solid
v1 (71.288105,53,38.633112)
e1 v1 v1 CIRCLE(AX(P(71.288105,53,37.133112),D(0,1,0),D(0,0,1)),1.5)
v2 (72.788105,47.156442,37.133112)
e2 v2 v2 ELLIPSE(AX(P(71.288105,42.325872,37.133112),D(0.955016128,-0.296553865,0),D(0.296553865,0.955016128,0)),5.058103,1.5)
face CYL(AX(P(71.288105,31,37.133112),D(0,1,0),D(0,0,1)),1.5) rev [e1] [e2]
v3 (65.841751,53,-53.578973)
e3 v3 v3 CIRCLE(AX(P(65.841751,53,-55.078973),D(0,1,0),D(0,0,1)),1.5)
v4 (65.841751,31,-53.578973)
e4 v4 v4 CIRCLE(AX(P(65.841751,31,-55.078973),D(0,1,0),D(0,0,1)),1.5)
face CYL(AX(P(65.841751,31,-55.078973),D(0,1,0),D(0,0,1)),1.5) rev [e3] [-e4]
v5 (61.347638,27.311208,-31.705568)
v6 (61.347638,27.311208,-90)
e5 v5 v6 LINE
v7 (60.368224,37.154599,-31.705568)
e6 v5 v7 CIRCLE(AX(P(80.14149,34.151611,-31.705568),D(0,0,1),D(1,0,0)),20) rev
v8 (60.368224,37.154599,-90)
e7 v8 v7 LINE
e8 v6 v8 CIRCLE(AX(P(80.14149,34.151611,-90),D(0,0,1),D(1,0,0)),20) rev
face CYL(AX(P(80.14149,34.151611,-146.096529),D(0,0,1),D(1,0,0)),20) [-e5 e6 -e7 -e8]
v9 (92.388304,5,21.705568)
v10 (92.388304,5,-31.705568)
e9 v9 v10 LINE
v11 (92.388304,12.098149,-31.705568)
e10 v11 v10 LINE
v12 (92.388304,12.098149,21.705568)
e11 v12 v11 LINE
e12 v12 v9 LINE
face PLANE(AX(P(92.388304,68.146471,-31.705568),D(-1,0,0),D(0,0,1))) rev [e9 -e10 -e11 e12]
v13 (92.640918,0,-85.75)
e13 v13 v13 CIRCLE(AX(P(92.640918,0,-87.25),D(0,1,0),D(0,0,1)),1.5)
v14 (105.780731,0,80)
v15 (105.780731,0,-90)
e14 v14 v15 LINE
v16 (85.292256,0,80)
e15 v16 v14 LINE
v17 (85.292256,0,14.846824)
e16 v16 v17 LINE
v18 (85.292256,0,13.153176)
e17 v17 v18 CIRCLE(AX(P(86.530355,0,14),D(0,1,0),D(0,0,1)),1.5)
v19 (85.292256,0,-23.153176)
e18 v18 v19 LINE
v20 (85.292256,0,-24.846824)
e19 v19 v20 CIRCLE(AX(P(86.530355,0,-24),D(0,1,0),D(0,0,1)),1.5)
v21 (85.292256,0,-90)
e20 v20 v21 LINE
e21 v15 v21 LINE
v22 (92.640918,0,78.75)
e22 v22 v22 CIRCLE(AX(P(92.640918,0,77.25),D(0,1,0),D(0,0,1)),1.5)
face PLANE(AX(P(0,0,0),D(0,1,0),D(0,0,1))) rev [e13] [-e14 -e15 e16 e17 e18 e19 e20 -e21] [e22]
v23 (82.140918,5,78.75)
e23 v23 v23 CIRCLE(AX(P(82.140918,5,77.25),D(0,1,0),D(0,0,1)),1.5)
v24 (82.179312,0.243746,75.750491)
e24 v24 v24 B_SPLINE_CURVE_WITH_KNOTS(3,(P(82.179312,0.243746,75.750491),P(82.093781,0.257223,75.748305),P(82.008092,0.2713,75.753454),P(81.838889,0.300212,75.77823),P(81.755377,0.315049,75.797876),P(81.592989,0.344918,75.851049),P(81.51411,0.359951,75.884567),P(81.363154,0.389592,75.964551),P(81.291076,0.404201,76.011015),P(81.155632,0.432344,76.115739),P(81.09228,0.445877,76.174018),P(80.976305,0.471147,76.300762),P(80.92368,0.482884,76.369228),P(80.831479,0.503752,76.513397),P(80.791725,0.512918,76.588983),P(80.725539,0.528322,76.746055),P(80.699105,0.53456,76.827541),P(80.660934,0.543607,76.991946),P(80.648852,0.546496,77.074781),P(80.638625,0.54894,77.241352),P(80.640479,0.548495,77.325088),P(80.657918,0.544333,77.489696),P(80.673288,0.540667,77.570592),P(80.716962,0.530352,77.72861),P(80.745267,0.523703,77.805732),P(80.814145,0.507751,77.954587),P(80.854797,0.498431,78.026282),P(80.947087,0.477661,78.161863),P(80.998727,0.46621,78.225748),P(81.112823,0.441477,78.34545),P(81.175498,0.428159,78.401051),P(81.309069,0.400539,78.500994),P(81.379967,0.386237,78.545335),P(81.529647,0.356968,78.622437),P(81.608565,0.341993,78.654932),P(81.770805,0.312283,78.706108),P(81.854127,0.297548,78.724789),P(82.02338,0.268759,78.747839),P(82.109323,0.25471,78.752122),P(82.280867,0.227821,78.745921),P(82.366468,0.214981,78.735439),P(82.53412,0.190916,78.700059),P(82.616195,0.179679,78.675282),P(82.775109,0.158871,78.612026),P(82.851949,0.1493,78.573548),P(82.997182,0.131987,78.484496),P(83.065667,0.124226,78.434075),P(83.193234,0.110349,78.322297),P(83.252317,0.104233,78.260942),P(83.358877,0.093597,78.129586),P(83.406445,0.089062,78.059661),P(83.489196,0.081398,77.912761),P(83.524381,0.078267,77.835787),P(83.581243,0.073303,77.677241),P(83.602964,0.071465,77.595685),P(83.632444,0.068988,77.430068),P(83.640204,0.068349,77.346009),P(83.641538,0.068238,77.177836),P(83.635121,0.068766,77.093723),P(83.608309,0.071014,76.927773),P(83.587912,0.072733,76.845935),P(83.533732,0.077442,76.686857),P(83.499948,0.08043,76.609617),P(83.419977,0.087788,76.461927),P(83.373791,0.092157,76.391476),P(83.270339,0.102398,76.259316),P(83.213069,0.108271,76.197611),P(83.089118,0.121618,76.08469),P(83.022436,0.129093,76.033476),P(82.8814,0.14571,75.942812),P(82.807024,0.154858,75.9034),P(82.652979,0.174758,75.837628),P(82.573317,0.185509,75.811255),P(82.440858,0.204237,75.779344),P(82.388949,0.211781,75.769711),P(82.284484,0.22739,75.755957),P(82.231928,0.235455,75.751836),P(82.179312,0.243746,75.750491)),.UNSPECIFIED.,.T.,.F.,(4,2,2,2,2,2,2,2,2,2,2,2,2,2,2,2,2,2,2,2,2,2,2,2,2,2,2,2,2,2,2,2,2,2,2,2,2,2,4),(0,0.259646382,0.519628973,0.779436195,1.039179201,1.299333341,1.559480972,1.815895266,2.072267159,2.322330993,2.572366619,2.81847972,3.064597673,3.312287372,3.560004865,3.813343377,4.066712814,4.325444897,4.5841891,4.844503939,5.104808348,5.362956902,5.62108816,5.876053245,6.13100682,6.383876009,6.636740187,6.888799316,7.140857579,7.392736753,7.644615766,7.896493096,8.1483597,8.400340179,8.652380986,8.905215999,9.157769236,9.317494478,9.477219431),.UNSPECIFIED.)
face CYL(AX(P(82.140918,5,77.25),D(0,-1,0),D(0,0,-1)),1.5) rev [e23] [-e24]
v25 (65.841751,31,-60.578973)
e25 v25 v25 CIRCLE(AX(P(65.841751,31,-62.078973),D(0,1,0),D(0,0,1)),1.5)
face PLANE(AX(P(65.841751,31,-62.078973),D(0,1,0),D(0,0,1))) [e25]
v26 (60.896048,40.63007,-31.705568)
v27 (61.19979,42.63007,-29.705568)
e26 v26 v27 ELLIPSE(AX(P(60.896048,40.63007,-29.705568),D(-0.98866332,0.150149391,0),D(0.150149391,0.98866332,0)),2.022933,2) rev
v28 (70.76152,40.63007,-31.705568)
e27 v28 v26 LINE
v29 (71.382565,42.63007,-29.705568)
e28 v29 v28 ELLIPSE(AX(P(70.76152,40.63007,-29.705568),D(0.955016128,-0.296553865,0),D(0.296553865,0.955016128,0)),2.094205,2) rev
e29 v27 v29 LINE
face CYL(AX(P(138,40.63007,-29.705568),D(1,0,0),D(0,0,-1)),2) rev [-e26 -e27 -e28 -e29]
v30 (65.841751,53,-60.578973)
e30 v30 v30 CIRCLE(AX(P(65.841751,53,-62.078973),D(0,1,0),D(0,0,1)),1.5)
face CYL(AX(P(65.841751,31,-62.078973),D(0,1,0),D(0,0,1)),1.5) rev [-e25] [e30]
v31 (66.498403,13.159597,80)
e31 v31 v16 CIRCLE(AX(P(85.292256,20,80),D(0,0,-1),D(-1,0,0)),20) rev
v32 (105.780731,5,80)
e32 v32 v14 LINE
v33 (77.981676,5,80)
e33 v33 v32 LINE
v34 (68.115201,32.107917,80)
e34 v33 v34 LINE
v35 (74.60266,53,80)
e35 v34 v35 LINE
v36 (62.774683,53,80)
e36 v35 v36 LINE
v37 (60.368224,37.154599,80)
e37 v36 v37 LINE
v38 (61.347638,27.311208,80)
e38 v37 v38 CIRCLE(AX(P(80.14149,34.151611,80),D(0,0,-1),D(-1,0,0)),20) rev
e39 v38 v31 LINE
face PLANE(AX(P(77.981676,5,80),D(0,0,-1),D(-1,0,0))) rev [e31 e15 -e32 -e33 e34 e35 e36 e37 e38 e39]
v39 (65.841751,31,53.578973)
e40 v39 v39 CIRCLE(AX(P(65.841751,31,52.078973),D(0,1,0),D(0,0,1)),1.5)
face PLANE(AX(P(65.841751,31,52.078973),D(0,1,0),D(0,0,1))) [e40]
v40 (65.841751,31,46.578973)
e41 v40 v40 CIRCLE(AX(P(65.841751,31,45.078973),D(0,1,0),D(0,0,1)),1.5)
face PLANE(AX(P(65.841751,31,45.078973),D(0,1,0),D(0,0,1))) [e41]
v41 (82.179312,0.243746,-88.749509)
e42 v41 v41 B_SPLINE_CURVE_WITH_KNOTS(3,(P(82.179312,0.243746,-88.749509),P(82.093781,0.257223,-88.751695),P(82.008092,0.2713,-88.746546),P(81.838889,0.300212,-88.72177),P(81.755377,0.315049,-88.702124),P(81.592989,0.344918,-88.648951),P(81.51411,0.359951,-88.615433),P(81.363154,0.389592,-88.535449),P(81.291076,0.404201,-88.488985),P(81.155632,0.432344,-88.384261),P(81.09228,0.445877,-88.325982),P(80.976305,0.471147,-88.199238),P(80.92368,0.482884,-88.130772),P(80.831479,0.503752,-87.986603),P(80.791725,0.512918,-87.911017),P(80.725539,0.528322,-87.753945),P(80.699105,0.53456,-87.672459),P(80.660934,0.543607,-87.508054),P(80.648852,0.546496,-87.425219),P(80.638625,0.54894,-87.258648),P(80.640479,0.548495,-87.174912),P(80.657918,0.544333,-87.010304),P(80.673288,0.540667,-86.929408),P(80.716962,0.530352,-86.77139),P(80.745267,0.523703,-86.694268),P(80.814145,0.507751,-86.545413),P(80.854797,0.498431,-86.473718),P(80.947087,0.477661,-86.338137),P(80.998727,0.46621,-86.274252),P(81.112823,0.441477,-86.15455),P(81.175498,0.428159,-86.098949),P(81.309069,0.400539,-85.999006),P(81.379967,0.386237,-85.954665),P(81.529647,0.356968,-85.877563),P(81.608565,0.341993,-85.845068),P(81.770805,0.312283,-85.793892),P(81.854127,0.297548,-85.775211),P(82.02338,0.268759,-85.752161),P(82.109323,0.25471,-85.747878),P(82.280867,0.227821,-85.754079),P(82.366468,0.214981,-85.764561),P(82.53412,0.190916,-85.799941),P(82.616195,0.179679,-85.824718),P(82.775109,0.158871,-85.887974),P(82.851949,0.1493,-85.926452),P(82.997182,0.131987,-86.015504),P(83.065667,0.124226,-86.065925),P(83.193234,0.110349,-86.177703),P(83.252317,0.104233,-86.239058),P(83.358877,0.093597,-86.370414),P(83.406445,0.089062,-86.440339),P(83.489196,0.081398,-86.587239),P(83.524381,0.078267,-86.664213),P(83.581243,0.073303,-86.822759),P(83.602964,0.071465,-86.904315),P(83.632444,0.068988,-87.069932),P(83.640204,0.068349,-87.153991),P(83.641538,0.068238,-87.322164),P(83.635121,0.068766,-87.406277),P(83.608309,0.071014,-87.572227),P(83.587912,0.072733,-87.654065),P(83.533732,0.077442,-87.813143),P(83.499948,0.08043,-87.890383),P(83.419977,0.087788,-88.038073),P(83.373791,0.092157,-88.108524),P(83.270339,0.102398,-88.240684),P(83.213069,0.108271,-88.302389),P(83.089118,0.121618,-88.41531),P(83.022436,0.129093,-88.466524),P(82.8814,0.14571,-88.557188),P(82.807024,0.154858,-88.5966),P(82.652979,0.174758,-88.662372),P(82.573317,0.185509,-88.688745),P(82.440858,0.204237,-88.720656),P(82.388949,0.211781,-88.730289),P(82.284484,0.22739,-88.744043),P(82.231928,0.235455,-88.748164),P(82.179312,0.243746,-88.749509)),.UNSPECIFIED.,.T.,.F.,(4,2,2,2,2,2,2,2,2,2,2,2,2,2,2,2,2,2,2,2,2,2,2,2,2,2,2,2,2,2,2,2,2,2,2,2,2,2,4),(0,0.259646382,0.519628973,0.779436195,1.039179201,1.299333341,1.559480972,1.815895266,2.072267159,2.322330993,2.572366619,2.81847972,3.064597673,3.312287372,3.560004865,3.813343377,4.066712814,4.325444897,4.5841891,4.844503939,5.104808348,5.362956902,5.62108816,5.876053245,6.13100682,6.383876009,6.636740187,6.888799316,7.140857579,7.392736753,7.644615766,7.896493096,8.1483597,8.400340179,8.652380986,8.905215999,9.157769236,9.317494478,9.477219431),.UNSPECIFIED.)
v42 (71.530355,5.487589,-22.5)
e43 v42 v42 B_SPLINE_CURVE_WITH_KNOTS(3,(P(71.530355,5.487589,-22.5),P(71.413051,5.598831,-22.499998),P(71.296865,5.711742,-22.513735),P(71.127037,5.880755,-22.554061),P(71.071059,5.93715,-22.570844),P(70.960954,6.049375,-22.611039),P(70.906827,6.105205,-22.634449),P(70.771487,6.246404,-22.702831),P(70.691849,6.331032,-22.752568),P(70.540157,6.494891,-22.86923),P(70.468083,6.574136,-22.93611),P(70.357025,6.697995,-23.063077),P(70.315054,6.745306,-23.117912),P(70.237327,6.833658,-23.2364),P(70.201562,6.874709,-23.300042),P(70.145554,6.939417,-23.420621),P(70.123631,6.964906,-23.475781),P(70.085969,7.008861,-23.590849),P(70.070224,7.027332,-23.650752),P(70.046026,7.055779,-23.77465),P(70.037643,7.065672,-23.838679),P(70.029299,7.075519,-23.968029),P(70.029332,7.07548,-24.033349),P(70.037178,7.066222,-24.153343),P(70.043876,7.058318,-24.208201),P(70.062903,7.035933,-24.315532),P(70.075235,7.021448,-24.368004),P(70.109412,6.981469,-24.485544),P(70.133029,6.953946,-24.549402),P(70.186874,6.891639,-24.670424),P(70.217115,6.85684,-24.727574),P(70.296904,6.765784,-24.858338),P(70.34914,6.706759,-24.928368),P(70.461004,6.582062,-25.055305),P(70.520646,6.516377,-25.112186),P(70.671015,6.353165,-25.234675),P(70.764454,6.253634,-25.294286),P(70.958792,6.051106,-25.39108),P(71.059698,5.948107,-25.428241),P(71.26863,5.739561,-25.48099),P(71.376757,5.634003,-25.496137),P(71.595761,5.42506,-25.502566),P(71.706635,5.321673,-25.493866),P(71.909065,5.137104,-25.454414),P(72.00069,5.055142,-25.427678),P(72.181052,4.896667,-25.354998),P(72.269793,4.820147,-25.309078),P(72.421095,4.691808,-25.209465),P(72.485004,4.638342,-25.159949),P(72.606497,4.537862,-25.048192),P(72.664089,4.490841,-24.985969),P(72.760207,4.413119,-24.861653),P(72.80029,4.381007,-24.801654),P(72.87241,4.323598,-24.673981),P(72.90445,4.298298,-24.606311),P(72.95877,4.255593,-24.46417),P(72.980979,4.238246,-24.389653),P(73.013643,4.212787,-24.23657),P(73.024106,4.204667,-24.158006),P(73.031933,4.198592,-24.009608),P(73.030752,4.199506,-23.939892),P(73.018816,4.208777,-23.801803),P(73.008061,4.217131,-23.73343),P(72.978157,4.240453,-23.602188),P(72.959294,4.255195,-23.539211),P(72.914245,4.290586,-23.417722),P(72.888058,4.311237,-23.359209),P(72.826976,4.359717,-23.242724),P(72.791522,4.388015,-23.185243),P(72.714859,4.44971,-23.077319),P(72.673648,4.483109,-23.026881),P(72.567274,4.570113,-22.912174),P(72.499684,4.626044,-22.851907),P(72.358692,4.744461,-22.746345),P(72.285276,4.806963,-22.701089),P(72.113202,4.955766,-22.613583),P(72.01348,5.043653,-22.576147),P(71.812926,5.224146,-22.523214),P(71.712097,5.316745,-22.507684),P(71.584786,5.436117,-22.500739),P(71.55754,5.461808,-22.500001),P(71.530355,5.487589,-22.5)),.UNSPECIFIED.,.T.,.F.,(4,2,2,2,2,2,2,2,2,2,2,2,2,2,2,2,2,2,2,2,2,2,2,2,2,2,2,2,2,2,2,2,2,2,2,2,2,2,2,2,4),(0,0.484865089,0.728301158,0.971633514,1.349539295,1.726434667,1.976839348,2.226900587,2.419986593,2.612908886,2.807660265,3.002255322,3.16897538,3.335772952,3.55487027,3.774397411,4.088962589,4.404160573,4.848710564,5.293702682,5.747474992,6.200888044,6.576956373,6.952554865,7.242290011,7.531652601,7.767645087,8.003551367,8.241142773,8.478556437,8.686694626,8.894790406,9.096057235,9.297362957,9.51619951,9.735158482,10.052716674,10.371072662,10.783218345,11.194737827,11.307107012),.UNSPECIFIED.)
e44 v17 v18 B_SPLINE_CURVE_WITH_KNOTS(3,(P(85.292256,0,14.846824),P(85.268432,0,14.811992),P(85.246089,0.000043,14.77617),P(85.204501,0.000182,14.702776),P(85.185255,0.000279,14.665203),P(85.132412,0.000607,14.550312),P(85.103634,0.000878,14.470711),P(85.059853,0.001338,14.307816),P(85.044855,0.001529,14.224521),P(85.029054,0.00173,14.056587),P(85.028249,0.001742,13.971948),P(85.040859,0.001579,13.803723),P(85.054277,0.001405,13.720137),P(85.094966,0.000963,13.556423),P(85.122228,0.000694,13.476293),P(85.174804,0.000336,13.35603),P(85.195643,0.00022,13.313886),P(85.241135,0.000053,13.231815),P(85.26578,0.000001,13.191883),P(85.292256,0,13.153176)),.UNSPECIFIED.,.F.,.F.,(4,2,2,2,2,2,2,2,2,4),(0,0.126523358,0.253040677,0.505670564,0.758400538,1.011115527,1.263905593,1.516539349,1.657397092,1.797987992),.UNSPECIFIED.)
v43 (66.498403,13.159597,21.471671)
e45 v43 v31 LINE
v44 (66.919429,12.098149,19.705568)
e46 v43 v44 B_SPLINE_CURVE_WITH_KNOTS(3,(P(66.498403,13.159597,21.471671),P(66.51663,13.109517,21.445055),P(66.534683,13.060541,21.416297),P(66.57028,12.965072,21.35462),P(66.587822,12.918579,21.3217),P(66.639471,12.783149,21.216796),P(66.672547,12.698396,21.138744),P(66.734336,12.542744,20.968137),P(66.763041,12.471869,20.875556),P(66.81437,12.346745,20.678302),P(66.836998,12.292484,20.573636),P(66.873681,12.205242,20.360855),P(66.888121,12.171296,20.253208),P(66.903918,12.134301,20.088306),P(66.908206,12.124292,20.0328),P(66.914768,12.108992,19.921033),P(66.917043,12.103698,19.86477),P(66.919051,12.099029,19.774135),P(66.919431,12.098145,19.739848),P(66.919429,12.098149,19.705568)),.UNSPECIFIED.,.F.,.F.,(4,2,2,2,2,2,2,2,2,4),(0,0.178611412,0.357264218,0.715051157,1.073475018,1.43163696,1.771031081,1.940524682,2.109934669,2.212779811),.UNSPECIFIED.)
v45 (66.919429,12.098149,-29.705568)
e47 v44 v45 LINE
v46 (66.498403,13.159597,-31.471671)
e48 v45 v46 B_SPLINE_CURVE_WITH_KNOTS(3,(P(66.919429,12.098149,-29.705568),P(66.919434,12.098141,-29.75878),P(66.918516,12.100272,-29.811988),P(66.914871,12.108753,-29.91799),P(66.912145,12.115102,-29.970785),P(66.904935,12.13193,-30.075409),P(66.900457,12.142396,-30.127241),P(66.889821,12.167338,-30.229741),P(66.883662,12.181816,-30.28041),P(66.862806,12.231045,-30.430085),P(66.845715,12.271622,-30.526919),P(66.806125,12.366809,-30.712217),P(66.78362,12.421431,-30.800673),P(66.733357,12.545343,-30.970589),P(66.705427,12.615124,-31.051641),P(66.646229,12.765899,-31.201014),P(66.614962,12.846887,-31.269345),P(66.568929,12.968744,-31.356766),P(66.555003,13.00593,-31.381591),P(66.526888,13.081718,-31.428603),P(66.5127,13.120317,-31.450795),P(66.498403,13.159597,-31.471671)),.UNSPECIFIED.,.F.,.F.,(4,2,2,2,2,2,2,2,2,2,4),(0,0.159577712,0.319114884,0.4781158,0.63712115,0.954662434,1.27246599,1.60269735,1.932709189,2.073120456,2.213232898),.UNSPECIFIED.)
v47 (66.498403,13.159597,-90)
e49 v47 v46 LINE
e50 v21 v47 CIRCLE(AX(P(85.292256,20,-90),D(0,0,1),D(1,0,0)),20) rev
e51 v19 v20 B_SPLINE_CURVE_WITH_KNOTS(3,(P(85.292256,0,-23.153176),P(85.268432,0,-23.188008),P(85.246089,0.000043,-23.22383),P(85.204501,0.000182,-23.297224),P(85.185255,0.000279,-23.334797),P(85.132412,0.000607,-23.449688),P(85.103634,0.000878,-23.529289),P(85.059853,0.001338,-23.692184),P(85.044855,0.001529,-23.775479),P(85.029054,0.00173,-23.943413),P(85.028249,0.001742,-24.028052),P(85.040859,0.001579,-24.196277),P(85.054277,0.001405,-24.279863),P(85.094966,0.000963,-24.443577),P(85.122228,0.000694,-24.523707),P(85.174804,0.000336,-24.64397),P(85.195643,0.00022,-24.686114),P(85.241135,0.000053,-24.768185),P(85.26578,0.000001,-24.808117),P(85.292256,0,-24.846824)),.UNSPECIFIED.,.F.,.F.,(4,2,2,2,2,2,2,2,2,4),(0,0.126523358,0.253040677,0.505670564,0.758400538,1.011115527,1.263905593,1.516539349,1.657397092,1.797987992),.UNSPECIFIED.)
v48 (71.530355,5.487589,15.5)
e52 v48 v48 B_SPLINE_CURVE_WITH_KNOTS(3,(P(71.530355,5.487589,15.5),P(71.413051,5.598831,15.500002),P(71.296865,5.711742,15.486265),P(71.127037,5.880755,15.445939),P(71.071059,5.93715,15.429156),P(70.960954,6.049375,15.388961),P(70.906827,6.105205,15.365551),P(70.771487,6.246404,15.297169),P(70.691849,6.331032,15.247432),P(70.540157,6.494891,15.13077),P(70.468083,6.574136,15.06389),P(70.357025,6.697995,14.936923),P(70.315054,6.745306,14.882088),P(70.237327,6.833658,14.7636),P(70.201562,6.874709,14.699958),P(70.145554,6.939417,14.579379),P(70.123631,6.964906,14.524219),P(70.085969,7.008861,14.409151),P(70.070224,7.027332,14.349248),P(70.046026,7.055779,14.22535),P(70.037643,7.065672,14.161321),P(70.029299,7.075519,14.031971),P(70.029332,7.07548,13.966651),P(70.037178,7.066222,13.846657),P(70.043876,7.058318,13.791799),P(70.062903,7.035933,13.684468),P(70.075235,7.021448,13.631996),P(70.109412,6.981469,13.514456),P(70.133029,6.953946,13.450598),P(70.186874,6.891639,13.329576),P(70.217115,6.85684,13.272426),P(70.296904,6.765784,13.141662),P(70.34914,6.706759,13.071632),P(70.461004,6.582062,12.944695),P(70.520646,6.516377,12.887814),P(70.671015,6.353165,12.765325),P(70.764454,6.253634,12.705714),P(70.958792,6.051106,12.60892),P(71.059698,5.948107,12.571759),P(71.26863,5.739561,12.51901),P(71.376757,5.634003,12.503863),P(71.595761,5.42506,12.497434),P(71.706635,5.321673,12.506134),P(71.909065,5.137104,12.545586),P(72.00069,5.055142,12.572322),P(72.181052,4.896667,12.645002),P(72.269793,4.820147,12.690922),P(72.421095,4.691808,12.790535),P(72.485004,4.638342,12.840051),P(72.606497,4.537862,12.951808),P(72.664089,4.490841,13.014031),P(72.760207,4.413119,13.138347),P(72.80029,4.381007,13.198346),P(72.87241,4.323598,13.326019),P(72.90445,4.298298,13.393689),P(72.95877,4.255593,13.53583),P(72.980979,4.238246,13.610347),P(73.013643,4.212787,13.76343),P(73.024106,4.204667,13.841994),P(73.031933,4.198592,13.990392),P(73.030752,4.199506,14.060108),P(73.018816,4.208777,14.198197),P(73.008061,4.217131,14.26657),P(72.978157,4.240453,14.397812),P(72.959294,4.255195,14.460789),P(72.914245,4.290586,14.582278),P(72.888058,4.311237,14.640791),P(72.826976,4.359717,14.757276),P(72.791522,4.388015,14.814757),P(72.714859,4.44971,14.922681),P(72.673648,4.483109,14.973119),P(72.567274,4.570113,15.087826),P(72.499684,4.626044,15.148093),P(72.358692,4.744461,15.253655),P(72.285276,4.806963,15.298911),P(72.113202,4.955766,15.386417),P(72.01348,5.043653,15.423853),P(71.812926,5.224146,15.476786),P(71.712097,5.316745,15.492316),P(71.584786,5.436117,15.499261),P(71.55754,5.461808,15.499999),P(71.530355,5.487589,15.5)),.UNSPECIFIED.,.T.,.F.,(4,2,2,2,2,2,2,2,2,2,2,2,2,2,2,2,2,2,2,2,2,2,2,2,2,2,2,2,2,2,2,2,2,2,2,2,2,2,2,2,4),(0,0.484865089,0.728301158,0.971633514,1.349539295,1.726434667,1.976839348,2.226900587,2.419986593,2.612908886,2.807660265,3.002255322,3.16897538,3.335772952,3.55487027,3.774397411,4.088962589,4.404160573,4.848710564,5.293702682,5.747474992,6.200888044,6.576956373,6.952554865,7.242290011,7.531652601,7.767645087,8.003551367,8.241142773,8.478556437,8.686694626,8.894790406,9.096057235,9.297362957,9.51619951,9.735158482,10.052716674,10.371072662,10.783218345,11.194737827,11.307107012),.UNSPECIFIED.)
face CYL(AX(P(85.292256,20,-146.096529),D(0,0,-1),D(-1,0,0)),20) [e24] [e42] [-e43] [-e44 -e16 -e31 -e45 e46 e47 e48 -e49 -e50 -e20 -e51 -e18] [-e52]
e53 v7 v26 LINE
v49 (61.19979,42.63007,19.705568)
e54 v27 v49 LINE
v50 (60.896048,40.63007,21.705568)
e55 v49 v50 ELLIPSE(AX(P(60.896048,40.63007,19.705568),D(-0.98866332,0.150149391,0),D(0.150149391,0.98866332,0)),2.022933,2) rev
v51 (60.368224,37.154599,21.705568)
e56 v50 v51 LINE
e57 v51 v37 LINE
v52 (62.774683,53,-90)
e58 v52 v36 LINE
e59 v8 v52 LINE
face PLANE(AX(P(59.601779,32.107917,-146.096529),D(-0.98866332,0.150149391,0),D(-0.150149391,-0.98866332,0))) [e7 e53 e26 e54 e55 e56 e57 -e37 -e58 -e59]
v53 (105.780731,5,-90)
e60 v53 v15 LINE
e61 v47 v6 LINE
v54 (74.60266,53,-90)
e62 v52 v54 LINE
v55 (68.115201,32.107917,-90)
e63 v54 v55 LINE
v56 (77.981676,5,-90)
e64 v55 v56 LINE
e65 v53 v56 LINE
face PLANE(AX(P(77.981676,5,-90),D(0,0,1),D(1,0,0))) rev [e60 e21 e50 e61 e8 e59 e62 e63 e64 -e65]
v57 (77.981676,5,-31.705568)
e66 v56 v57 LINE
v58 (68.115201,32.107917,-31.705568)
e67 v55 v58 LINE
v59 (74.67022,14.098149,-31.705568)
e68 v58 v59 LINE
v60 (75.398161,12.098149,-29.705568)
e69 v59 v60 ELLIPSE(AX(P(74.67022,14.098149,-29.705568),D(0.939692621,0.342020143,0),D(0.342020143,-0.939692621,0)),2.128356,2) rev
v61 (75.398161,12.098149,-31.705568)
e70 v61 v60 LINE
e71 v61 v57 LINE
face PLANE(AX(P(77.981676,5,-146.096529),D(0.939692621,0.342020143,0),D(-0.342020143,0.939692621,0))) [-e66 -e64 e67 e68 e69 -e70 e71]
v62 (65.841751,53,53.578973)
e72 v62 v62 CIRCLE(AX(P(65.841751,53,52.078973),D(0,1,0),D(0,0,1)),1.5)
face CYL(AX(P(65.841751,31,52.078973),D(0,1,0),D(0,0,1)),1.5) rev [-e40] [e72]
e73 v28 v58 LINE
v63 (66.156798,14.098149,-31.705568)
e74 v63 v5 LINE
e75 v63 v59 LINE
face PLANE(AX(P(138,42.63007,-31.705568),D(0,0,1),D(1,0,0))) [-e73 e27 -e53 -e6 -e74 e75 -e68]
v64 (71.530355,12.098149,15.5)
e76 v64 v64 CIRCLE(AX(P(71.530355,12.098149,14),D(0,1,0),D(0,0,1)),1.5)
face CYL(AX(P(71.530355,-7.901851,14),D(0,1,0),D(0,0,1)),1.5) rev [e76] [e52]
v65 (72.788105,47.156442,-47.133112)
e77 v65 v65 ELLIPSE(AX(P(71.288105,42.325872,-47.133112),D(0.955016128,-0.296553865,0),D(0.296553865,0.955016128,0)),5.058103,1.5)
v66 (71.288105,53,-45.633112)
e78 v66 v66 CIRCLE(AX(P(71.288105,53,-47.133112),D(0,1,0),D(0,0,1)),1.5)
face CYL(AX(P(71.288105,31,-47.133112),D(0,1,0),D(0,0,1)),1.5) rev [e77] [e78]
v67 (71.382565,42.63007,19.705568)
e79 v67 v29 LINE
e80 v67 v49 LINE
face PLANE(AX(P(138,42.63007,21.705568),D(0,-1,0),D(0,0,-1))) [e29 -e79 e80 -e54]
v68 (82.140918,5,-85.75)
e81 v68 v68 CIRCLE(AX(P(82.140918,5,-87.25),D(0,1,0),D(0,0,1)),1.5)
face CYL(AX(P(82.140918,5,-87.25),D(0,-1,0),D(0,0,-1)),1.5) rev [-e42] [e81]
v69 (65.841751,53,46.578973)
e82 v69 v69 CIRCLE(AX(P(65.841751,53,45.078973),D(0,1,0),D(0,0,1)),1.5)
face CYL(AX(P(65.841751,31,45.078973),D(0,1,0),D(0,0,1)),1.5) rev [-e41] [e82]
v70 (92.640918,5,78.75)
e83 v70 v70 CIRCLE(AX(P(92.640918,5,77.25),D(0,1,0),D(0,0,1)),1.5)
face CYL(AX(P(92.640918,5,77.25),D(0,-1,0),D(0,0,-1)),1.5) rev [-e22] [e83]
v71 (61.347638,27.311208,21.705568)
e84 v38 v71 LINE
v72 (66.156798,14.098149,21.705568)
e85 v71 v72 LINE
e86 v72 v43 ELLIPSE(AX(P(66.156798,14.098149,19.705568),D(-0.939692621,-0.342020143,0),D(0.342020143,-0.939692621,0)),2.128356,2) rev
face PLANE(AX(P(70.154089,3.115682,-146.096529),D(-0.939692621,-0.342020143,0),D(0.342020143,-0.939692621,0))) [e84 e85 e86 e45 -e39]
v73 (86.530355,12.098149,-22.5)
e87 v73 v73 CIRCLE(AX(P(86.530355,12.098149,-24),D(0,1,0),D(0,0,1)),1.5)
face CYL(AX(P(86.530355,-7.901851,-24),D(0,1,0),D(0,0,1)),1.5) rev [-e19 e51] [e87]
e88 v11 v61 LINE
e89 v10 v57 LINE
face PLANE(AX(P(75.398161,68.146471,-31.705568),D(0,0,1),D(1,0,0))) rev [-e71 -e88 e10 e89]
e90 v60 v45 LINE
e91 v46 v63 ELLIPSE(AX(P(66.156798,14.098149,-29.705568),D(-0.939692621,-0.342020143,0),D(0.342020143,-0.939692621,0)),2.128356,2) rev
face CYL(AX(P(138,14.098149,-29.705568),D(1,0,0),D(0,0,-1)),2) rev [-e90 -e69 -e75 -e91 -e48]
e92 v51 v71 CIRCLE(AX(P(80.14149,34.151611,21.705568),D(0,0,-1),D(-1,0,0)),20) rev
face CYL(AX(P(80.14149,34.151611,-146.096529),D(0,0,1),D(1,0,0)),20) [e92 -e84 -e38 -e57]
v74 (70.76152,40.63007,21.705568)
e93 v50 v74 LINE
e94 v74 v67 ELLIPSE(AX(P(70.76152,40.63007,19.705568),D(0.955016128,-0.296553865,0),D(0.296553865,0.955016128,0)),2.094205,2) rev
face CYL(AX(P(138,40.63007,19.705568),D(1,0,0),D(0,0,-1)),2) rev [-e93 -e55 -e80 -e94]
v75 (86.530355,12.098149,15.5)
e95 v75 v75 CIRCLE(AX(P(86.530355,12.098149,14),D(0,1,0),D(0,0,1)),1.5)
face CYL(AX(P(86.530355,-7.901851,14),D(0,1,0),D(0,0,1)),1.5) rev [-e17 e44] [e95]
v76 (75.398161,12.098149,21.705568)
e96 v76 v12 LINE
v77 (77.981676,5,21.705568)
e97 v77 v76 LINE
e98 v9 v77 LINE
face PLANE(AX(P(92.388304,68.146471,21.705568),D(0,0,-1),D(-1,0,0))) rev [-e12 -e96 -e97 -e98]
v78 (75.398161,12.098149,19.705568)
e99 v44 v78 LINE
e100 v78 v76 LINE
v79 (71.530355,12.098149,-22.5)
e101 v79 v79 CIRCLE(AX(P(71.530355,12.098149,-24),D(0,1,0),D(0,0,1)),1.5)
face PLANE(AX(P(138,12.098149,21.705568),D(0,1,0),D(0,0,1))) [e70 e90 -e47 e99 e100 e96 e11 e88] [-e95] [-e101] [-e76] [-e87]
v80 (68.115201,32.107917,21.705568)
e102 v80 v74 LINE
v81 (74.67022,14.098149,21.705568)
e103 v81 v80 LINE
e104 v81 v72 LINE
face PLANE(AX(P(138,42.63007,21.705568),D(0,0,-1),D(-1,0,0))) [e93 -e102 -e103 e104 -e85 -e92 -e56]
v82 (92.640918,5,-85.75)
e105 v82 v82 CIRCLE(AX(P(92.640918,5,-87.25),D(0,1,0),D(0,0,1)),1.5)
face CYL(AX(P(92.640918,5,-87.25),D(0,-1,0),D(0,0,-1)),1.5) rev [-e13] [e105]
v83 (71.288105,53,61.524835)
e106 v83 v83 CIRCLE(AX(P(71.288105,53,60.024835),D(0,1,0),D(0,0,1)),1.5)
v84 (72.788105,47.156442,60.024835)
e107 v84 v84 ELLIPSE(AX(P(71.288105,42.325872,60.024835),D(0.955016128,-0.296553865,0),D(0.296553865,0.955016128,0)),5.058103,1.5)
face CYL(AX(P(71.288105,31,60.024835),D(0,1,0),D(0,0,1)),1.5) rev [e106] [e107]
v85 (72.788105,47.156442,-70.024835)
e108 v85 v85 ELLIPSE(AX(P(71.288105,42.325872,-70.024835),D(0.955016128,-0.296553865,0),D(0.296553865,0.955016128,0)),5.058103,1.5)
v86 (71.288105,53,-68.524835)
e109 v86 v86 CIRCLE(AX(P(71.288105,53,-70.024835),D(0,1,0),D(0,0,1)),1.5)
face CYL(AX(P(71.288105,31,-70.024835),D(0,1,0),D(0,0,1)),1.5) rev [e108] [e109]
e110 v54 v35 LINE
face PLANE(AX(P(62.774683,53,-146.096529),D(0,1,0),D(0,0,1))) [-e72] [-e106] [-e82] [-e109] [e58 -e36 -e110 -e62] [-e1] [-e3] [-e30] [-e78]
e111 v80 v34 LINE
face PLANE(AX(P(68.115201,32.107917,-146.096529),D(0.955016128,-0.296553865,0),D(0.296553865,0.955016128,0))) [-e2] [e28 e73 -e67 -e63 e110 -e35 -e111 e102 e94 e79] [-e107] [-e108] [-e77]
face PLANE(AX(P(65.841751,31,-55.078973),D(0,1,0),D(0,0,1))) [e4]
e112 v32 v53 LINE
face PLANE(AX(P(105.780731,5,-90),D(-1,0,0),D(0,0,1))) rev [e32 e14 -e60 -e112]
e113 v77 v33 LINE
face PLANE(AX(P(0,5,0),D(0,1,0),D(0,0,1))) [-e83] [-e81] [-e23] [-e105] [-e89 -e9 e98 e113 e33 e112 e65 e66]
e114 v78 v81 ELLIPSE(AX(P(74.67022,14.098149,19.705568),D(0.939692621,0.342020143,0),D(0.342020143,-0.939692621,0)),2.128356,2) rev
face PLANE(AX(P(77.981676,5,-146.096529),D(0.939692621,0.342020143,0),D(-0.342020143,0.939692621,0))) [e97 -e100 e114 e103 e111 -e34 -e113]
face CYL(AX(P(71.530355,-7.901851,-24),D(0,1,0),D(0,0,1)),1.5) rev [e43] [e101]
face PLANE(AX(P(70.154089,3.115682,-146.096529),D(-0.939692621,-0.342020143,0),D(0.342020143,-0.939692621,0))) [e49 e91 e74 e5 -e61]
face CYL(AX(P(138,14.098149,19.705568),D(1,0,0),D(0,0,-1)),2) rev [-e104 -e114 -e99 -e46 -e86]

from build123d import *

# Parameters (mm, degrees)
SKETCH_1_W          = 27.799055089
SKETCH_1_H          = 170
SKETCH_1_R          = 1.5
EXTRUDE_1_DEPTH     = 5
EXTRUDE_2_DEPTH     = 170
FILLET_1_R          = 20
FILLET_2_R          = 20
SKETCH_3_R          = 1.5
CUT_EXTRUDE_1_DEPTH = 22
SKETCH_5_W          = 53.411136204
SKETCH_5_H          = 30.531921538
CUT_EXTRUDE_2_DEPTH = 138
SKETCH_6_W          = 16.9901426
SKETCH_6_H          = 53.411136204
EXTRUDE_3_DEPTH     = 7.098148729
FILLET_3_R          = 2
SKETCH_7_R          = 1.5
CUT_EXTRUDE_3_DEPTH = 20


with BuildPart() as part:
    # 草图1 → 凸台-拉伸1 (new body)
    with BuildSketch(Plane(origin=(0, 0, 0), x_dir=(1, 0, 0), z_dir=(0, 1, 0))):
        with Locations((91.881203353, 5)):
            Rectangle(SKETCH_1_W, SKETCH_1_H)
        with Locations(Location((82.140918425, 87.25, 0), (0, 0, 270))):
            Circle(SKETCH_1_R, mode=Mode.SUBTRACT)
        with Locations(Location((92.640918425, 87.25, 0), (0, 0, 270))):
            Circle(SKETCH_1_R, mode=Mode.SUBTRACT)
        with Locations(Location((82.140918425, -77.25, 0), (0, 0, 270))):
            Circle(SKETCH_1_R, mode=Mode.SUBTRACT)
        with Locations(Location((92.640918425, -77.25, 0), (0, 0, 270))):
            Circle(SKETCH_1_R, mode=Mode.SUBTRACT)
    extrude(amount=EXTRUDE_1_DEPTH)

    # 草图2 → 凸台-拉伸2 (add)
    with BuildSketch(Plane.XY.offset(80)):
        Polygon((70.154089187, 3.11568229), (59.601778844, 32.107916678), (60.432470808, 37.577633674), (62.77468262, 53), (74.6026601, 53), (68.115201024, 32.107916678), (77.981675808, 5), (77.981675808, 0), (71.288104799, 0), align=None)
    extrude(amount=-EXTRUDE_2_DEPTH)

    # 圆角1
    fillet_1_edges = [part.edges().sort_by_distance(p)[0] for p in [
        (59.601778844, 32.107916678, -5),
    ]]
    fillet(fillet_1_edges, radius=FILLET_1_R)

    # 圆角2
    # the kernel refuses this fillet: 20 mm, written as the material it takes off along each edge
    with BuildSketch(Plane(origin=(71.288104799, 0, 115.01037691), x_dir=(-0.34202014332567304, 0.9396926207859069, 0), z_dir=(0, 0, -1))) as fillet_2_piece_1:
        with BuildLine():
            CenterArc((FILLET_2_R * 0.70020753821, FILLET_2_R), FILLET_2_R, 200, 70)
            Line((-FILLET_2_R * 0.239485082576, FILLET_2_R * 0.657979856674), (0, 0))
            Line((0, 0), (FILLET_2_R * 0.70020753821, 0))
        make_face()
    extrude(amount=240.020753821, mode=Mode.SUBTRACT)

    # 草图3 → 切除-拉伸1 (cut)
    with BuildSketch(Plane(origin=(0, 53, 0), x_dir=(1, 0, 0), z_dir=(0, 1, 0))):
        with Locations(Location((71.288104799, 70.02483454, 0), (0, 0, 270))):
            Circle(SKETCH_3_R)
        with Locations(Location((65.841750728, 62.078973455, 0), (0, 0, 270))):
            Circle(SKETCH_3_R)
        with Locations(Location((65.841750728, 55.078973455, 0), (0, 0, 270))):
            Circle(SKETCH_3_R)
        with Locations(Location((71.288104799, 47.133112371, 0), (0, 0, 270))):
            Circle(SKETCH_3_R)
        with Locations(Location((71.288104799, -37.133112371, 0), (0, 0, 270))):
            Circle(SKETCH_3_R)
        with Locations(Location((65.841750728, -45.078973455, 0), (0, 0, 270))):
            Circle(SKETCH_3_R)
        with Locations(Location((65.841750728, -52.078973455, 0), (0, 0, 270))):
            Circle(SKETCH_3_R)
        with Locations(Location((71.288104799, -60.02483454, 0), (0, 0, 270))):
            Circle(SKETCH_3_R)
    extrude(amount=-CUT_EXTRUDE_1_DEPTH, mode=Mode.SUBTRACT)

    # 草图5 → 切除-拉伸2 (cut)
    with BuildSketch(Plane(origin=(0, 0, 0), x_dir=(0, 0, -1), z_dir=(1, 0, 0))):
        with Locations((5, 27.364109498)):
            Rectangle(SKETCH_5_W, SKETCH_5_H)
    extrude(amount=CUT_EXTRUDE_2_DEPTH, mode=Mode.SUBTRACT)

    # 草图6 → 凸台-拉伸3 (add)
    with BuildSketch(Plane(origin=(0, 5, 0), x_dir=(1, 0, 0), z_dir=(0, 1, 0))):
        with Locations((83.893232252, 5)):
            Rectangle(SKETCH_6_W, SKETCH_6_H)
    extrude(amount=EXTRUDE_3_DEPTH)

    # 圆角3
    fillet_3_edges = [part.edges().sort_by_distance(p)[0] for p in [
        (71.158795105, 12.098148729, -31.705568102),
        (71.158795105, 12.098148729, 21.705568102),
        (66.291177476, 42.630070267, 21.705568102),
        (66.291177476, 42.630070267, -31.705568102),
    ]]
    fillet(fillet_3_edges, radius=FILLET_3_R)

    # 草图7 → 切除-拉伸3 (cut)
    with BuildSketch(Plane(origin=(0, 12.098148729, 0), x_dir=(1, 0, 0), z_dir=(0, 1, 0))):
        with Locations(Location((71.530354556, -14, 0), (0, 0, 270))):
            Circle(SKETCH_7_R)
        with Locations(Location((71.530354556, 24, 0), (0, 0, 270))):
            Circle(SKETCH_7_R)
        with Locations(Location((86.530354556, 24, 0), (0, 0, 270))):
            Circle(SKETCH_7_R)
        with Locations(Location((86.530354556, -14, 0), (0, 0, 270))):
            Circle(SKETCH_7_R)
    extrude(amount=-CUT_EXTRUDE_3_DEPTH, mode=Mode.SUBTRACT)


solid = part.part
